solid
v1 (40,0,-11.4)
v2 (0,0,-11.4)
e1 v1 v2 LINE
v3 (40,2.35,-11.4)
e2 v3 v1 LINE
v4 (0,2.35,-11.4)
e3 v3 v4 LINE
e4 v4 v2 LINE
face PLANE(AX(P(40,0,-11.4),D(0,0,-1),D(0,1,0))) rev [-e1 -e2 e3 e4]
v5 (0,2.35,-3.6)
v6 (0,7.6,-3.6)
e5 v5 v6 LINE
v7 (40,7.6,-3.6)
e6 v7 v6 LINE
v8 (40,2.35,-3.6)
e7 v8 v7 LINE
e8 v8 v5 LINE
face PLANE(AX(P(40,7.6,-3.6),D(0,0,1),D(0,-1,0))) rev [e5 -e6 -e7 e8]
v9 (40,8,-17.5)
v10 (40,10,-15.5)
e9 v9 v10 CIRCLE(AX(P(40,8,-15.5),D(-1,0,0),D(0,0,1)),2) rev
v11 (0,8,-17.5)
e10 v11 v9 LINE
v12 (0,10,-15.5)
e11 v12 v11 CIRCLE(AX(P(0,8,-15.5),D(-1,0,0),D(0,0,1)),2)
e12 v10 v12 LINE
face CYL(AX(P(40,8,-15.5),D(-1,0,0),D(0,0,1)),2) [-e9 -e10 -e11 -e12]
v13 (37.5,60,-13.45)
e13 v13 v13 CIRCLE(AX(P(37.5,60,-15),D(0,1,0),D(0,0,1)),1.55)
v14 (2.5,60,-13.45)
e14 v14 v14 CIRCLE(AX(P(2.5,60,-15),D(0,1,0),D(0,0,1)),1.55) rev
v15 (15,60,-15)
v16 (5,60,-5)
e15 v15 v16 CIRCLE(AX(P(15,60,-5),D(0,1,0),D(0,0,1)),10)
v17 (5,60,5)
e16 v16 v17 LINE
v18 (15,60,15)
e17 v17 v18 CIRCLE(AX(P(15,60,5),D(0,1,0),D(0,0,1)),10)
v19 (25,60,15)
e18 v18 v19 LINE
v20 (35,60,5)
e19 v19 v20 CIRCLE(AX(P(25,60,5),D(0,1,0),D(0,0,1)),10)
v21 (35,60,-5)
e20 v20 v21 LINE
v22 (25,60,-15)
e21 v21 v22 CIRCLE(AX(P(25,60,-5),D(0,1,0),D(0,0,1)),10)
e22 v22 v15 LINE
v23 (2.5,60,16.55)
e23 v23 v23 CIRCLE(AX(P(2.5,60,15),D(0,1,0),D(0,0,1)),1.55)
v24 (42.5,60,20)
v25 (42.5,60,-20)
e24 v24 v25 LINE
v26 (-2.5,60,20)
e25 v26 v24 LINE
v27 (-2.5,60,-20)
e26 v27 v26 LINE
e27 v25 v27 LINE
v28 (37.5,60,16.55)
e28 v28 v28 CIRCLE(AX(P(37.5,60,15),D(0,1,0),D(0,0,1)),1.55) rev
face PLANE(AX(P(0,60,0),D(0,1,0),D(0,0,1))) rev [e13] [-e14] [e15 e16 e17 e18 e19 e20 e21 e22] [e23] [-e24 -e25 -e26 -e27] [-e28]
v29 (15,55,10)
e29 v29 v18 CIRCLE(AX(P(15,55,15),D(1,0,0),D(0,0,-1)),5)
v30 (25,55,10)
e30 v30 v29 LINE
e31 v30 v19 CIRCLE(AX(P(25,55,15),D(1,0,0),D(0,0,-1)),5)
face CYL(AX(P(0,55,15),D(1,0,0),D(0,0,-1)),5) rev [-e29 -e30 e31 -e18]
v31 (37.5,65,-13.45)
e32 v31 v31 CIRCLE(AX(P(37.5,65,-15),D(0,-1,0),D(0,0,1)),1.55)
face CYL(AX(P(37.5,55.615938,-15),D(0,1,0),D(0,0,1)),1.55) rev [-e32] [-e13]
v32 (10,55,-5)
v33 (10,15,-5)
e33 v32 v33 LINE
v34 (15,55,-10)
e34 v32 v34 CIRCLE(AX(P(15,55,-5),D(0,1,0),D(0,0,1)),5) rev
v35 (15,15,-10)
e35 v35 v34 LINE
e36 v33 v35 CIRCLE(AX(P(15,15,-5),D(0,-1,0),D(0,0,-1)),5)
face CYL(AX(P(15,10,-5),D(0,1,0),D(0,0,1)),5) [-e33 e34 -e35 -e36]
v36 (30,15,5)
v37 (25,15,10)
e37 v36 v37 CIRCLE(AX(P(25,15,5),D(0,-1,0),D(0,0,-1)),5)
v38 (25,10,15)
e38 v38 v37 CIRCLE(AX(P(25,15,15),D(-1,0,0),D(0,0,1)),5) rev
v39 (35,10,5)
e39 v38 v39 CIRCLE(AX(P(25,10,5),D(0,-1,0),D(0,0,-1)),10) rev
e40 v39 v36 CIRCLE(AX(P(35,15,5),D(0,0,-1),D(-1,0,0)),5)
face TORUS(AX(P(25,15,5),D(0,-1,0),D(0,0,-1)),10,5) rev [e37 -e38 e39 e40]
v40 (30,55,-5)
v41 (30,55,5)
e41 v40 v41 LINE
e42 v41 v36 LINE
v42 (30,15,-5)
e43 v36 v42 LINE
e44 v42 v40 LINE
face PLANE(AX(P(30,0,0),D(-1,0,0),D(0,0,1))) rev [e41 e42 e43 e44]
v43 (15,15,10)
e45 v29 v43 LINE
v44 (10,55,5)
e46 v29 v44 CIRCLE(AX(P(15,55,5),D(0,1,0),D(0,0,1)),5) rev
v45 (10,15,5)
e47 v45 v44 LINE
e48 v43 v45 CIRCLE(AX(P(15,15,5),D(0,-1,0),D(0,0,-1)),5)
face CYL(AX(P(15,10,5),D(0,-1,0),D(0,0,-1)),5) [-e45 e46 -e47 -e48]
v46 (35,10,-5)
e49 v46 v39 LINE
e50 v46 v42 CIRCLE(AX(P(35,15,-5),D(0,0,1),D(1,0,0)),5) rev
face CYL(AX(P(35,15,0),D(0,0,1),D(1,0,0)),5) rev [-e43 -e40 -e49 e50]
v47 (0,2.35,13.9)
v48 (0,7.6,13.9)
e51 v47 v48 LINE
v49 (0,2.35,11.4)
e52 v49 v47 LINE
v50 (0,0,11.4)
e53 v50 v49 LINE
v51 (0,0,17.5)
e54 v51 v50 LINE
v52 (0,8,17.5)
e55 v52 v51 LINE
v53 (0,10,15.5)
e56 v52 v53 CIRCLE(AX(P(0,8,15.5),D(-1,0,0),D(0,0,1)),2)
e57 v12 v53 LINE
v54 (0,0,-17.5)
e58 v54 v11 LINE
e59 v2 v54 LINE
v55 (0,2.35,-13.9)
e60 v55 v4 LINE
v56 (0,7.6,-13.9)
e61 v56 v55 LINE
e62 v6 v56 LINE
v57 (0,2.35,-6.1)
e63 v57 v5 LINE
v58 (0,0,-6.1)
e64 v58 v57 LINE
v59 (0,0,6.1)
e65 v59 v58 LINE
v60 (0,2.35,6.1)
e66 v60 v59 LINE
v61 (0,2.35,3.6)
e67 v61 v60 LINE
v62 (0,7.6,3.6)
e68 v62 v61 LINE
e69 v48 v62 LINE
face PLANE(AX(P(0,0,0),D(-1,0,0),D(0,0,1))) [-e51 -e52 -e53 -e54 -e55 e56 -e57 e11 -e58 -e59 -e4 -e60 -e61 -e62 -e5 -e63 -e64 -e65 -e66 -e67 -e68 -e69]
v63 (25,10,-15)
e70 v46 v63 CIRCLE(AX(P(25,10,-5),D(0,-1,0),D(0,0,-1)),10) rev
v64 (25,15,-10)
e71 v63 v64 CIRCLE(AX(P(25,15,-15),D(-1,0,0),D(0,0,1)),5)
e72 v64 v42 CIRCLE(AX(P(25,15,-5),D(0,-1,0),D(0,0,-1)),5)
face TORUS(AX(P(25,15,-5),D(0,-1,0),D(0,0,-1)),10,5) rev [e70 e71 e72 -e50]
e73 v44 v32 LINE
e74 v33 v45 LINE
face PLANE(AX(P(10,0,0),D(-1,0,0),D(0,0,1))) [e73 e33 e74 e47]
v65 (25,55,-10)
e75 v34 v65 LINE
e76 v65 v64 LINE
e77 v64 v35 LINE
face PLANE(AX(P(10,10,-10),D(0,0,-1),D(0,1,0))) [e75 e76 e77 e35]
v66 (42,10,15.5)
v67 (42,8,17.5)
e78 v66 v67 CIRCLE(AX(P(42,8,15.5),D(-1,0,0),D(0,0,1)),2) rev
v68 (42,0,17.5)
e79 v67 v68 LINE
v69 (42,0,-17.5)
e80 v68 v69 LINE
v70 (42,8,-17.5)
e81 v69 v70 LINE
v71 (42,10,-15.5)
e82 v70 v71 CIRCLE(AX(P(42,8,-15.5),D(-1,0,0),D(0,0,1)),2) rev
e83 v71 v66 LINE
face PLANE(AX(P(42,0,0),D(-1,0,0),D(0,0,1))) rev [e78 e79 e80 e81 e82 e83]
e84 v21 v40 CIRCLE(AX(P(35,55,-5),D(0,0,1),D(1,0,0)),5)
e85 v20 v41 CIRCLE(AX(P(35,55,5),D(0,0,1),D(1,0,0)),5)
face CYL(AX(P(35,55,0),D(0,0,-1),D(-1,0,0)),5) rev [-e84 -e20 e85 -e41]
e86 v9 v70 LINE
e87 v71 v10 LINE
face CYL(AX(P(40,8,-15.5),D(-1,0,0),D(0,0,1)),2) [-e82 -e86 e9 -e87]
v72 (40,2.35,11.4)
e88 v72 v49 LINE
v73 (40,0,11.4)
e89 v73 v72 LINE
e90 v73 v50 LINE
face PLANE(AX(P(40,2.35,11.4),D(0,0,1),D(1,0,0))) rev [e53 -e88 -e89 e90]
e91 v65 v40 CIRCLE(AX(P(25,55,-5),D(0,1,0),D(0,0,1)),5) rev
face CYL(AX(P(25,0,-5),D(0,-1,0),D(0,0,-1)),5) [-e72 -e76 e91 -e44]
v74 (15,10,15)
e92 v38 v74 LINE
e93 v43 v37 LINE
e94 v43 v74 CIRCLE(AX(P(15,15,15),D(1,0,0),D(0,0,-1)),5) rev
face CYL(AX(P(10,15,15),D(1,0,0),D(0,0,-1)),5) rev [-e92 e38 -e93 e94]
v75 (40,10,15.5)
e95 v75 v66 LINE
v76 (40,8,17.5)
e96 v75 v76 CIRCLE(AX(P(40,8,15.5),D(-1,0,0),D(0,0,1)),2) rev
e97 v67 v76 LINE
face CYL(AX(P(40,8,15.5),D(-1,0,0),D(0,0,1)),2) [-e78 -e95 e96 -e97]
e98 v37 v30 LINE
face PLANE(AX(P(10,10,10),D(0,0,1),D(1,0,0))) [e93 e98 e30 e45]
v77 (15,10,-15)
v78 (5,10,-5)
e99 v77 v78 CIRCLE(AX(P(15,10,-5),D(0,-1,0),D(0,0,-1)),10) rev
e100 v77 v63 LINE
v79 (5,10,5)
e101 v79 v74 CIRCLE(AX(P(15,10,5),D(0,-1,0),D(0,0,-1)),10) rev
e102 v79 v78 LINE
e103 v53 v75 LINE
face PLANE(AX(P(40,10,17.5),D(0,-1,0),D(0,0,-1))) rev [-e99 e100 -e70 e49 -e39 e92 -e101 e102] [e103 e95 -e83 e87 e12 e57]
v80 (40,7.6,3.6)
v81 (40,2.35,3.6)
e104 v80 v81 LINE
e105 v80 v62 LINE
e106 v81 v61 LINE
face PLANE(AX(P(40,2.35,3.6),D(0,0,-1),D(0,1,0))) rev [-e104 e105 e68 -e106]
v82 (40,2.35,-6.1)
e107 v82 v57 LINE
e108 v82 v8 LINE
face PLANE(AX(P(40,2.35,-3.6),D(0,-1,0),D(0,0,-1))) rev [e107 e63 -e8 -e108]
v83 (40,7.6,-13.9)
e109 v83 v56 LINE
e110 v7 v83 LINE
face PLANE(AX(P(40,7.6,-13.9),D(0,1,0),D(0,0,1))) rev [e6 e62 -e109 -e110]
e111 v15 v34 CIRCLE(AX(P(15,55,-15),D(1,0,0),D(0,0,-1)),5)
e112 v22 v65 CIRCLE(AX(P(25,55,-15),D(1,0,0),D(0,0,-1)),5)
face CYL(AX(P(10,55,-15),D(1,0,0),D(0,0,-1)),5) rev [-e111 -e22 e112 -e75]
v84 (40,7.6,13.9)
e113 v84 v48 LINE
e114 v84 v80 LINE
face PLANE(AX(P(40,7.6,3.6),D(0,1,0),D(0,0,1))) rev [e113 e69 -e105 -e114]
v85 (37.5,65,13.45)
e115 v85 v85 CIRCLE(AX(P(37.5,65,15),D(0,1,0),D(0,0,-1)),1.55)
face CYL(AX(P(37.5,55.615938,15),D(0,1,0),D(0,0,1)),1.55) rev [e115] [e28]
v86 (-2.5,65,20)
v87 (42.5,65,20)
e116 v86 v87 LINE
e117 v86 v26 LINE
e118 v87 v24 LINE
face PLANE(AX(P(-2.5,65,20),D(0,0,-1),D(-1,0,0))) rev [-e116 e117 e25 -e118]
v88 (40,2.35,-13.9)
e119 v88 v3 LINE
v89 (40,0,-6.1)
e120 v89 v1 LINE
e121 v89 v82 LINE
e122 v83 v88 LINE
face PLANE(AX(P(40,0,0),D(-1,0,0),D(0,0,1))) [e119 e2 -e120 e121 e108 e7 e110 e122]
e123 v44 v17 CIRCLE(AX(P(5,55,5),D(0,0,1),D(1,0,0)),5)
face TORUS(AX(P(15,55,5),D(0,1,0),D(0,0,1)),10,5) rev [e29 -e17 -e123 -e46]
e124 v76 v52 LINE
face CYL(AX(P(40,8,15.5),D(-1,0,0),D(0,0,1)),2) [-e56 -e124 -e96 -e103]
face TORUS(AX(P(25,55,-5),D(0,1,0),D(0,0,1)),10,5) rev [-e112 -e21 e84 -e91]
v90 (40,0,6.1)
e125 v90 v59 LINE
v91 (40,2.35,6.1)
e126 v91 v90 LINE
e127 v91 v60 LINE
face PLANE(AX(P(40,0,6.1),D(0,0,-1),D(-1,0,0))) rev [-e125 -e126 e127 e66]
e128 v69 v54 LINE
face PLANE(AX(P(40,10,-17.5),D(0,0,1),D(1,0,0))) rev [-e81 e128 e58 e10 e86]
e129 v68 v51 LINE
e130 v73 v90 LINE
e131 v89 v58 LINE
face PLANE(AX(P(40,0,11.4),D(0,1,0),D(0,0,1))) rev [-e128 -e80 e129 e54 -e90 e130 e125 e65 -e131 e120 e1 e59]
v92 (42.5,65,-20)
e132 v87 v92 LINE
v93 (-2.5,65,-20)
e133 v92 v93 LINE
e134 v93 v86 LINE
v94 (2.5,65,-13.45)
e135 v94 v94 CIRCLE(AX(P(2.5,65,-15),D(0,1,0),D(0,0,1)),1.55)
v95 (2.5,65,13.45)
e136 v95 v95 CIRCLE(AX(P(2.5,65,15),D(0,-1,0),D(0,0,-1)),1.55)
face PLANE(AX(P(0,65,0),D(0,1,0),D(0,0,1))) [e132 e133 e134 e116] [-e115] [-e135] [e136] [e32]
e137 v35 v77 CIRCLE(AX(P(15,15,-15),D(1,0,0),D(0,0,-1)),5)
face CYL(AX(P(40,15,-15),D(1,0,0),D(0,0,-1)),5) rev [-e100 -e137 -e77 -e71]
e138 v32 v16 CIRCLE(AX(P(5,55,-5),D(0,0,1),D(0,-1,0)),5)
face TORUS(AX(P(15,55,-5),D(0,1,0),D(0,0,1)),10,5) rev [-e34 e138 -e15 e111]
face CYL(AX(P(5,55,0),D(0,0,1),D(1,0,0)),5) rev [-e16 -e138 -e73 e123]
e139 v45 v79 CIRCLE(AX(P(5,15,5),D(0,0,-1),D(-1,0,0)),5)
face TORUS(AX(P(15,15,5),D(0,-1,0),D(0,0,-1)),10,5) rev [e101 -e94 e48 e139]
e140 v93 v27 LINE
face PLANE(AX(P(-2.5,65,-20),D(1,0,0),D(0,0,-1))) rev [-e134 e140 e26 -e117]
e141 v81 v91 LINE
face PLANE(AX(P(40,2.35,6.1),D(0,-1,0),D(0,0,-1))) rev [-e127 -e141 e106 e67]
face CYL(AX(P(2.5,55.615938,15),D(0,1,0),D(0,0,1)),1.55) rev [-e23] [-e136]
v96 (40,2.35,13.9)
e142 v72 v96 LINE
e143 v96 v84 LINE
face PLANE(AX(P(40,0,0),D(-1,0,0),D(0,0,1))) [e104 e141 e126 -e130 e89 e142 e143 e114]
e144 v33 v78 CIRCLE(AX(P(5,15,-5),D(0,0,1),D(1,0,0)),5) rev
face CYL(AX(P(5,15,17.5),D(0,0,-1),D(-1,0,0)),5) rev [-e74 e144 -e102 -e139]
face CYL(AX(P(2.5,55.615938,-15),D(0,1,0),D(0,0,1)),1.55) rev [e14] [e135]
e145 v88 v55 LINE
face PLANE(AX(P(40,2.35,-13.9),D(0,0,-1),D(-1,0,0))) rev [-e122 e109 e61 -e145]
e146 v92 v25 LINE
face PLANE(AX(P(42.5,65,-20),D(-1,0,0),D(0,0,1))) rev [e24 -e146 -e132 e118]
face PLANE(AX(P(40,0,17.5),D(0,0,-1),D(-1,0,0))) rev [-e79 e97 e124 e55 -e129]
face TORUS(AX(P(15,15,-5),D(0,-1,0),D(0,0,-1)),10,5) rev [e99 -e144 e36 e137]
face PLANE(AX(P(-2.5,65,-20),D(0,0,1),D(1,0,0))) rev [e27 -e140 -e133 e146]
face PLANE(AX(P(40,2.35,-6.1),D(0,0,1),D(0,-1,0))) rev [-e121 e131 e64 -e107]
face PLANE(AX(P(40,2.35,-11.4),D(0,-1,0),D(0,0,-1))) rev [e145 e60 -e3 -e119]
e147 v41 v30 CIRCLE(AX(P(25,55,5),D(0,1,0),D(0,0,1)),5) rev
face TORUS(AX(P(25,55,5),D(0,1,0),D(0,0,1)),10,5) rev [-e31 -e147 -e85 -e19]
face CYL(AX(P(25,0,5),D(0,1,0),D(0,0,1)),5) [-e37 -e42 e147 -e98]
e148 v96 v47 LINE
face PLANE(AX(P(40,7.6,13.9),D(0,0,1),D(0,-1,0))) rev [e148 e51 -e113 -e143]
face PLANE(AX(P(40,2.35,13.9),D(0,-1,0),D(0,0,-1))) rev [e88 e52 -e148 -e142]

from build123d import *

# Parameters (mm, degrees)
BOSS_EXTRUDE1_DEPTH = 40
BOSS_EXTRUDE2_START = -10
SKETCH2_W           = 20
SKETCH2_H           = 50
BOSS_EXTRUDE2_DEPTH = 20
FILLET1_R           = 5
FILLET2_R           = 2
SKETCH3_W           = 45
SKETCH3_H           = 40
BOSS_EXTRUDE3_DEPTH = 5
FILLET3_R           = 5
SKETCH4_R           = 1.55
CUT_EXTRUDE1_DEPTH  = 5
MIRROR4_START       = 60
MIRROR4_OUTLINE_R   = 1.55
MIRROR4_DEPTH       = 5
SKETCH5_W           = 35
SKETCH5_H           = 10
BOSS_EXTRUDE4_DEPTH = 2
FILLET4_R           = 2


# Read off the part's stored shape, not the designer's step: Mirror4
with BuildPart() as part:
    # Sketch1 → Boss-Extrude1 (new body)
    with BuildSketch(Plane(origin=(0, 0, 0), x_dir=(0, 0, -1), z_dir=(1, 0, 0))):
        Polygon((-11.4, 0), (-17.5, 0), (-17.5, 10), (17.5, 10), (17.5, 0), (11.4, 0), (11.4, 2.35), (13.9, 2.35), (13.9, 7.6), (3.6, 7.6), (3.6, 2.35), (6.1, 2.35), (6.1, 0), (-6.1, 0), (-6.1, 2.35), (-3.6, 2.35), (-3.6, 7.6), (-13.9, 7.6), (-13.9, 2.35), (-11.4, 2.35), align=None)
    extrude(amount=BOSS_EXTRUDE1_DEPTH)

    # Sketch2 → Boss-Extrude2 (add)
    with BuildSketch(Plane(origin=(40, 0, 0), x_dir=(0, 0, -1), z_dir=(1, 0, 0)).offset(BOSS_EXTRUDE2_START)):
        with Locations((0, 35)):
            Rectangle(SKETCH2_W, SKETCH2_H)
    extrude(amount=-BOSS_EXTRUDE2_DEPTH)

    # Fillet1
    fillet1_edges = [part.edges().sort_by_distance(p)[0] for p in [
        (10, 35, 10),
        (20, 10, 10),
        (10, 35, -10),
        (10, 10, 0),
        (20, 10, -10),
        (30, 35, 10),
        (30, 10, 0),
        (30, 35, -10),
    ]]
    fillet(fillet1_edges, radius=FILLET1_R)

    # Fillet2
    fillet2_edges = [part.edges().sort_by_distance(p)[0] for p in [
        (20, 10, 17.5),
        (20, 10, -17.5),
    ]]
    fillet(fillet2_edges, radius=FILLET2_R)

    # Sketch3 → Boss-Extrude3 (add)
    with BuildSketch(Plane(origin=(0, 60, 0), x_dir=(1, 0, 0), z_dir=(0, 1, 0))):
        with Locations((20, 0)):
            Rectangle(SKETCH3_W, SKETCH3_H)
    extrude(amount=BOSS_EXTRUDE3_DEPTH)

    # Fillet3
    fillet3_edges = [part.edges().sort_by_distance(p)[0] for p in [
        (20, 60, 10),
        (30, 60, 0),
        (20, 60, -10),
        (10, 60, 0),
        (28.535533906, 60, 8.535533906),
        (28.535533906, 60, -8.535533906),
        (11.464466094, 60, 8.535533906),
        (11.464466094, 60, -8.535533906),
    ]]
    fillet(fillet3_edges, radius=FILLET3_R)

    # Sketch4 → Cut-Extrude1 (cut)
    with BuildSketch(Plane(origin=(0, 65, 0), x_dir=(1, 0, 0), z_dir=(0, 1, 0))):
        with Locations(Location((2.5, 15, 0), (0, 0, 270))):
            Circle(SKETCH4_R)
    extrude(amount=-CUT_EXTRUDE1_DEPTH, mode=Mode.SUBTRACT)

    # Mirror4 outline → Mirror4 (cut)
    with BuildSketch(Plane(origin=(0, 0, 0), x_dir=(1, 0, 0), z_dir=(0, 1, 0)).offset(MIRROR4_START)):
        with Locations((2.5, -15)):
            Circle(MIRROR4_OUTLINE_R)
        with Locations((37.5, 15)):
            Circle(MIRROR4_OUTLINE_R)
        with Locations((37.5, -15)):
            Circle(MIRROR4_OUTLINE_R)
    extrude(amount=MIRROR4_DEPTH, mode=Mode.SUBTRACT)

    # Sketch5 → Boss-Extrude4 (add)
    with BuildSketch(Plane(origin=(40, 0, 0), x_dir=(0, 0, -1), z_dir=(1, 0, 0))):
        with Locations((0, 5)):
            Rectangle(SKETCH5_W, SKETCH5_H)
    extrude(amount=BOSS_EXTRUDE4_DEPTH)

    # Fillet4
    fillet4_edges = [part.edges().sort_by_distance(p)[0] for p in [
        (41, 10, -17.5),
        (41, 10, 17.5),
    ]]
    fillet(fillet4_edges, radius=FILLET4_R)


solid = part.part
